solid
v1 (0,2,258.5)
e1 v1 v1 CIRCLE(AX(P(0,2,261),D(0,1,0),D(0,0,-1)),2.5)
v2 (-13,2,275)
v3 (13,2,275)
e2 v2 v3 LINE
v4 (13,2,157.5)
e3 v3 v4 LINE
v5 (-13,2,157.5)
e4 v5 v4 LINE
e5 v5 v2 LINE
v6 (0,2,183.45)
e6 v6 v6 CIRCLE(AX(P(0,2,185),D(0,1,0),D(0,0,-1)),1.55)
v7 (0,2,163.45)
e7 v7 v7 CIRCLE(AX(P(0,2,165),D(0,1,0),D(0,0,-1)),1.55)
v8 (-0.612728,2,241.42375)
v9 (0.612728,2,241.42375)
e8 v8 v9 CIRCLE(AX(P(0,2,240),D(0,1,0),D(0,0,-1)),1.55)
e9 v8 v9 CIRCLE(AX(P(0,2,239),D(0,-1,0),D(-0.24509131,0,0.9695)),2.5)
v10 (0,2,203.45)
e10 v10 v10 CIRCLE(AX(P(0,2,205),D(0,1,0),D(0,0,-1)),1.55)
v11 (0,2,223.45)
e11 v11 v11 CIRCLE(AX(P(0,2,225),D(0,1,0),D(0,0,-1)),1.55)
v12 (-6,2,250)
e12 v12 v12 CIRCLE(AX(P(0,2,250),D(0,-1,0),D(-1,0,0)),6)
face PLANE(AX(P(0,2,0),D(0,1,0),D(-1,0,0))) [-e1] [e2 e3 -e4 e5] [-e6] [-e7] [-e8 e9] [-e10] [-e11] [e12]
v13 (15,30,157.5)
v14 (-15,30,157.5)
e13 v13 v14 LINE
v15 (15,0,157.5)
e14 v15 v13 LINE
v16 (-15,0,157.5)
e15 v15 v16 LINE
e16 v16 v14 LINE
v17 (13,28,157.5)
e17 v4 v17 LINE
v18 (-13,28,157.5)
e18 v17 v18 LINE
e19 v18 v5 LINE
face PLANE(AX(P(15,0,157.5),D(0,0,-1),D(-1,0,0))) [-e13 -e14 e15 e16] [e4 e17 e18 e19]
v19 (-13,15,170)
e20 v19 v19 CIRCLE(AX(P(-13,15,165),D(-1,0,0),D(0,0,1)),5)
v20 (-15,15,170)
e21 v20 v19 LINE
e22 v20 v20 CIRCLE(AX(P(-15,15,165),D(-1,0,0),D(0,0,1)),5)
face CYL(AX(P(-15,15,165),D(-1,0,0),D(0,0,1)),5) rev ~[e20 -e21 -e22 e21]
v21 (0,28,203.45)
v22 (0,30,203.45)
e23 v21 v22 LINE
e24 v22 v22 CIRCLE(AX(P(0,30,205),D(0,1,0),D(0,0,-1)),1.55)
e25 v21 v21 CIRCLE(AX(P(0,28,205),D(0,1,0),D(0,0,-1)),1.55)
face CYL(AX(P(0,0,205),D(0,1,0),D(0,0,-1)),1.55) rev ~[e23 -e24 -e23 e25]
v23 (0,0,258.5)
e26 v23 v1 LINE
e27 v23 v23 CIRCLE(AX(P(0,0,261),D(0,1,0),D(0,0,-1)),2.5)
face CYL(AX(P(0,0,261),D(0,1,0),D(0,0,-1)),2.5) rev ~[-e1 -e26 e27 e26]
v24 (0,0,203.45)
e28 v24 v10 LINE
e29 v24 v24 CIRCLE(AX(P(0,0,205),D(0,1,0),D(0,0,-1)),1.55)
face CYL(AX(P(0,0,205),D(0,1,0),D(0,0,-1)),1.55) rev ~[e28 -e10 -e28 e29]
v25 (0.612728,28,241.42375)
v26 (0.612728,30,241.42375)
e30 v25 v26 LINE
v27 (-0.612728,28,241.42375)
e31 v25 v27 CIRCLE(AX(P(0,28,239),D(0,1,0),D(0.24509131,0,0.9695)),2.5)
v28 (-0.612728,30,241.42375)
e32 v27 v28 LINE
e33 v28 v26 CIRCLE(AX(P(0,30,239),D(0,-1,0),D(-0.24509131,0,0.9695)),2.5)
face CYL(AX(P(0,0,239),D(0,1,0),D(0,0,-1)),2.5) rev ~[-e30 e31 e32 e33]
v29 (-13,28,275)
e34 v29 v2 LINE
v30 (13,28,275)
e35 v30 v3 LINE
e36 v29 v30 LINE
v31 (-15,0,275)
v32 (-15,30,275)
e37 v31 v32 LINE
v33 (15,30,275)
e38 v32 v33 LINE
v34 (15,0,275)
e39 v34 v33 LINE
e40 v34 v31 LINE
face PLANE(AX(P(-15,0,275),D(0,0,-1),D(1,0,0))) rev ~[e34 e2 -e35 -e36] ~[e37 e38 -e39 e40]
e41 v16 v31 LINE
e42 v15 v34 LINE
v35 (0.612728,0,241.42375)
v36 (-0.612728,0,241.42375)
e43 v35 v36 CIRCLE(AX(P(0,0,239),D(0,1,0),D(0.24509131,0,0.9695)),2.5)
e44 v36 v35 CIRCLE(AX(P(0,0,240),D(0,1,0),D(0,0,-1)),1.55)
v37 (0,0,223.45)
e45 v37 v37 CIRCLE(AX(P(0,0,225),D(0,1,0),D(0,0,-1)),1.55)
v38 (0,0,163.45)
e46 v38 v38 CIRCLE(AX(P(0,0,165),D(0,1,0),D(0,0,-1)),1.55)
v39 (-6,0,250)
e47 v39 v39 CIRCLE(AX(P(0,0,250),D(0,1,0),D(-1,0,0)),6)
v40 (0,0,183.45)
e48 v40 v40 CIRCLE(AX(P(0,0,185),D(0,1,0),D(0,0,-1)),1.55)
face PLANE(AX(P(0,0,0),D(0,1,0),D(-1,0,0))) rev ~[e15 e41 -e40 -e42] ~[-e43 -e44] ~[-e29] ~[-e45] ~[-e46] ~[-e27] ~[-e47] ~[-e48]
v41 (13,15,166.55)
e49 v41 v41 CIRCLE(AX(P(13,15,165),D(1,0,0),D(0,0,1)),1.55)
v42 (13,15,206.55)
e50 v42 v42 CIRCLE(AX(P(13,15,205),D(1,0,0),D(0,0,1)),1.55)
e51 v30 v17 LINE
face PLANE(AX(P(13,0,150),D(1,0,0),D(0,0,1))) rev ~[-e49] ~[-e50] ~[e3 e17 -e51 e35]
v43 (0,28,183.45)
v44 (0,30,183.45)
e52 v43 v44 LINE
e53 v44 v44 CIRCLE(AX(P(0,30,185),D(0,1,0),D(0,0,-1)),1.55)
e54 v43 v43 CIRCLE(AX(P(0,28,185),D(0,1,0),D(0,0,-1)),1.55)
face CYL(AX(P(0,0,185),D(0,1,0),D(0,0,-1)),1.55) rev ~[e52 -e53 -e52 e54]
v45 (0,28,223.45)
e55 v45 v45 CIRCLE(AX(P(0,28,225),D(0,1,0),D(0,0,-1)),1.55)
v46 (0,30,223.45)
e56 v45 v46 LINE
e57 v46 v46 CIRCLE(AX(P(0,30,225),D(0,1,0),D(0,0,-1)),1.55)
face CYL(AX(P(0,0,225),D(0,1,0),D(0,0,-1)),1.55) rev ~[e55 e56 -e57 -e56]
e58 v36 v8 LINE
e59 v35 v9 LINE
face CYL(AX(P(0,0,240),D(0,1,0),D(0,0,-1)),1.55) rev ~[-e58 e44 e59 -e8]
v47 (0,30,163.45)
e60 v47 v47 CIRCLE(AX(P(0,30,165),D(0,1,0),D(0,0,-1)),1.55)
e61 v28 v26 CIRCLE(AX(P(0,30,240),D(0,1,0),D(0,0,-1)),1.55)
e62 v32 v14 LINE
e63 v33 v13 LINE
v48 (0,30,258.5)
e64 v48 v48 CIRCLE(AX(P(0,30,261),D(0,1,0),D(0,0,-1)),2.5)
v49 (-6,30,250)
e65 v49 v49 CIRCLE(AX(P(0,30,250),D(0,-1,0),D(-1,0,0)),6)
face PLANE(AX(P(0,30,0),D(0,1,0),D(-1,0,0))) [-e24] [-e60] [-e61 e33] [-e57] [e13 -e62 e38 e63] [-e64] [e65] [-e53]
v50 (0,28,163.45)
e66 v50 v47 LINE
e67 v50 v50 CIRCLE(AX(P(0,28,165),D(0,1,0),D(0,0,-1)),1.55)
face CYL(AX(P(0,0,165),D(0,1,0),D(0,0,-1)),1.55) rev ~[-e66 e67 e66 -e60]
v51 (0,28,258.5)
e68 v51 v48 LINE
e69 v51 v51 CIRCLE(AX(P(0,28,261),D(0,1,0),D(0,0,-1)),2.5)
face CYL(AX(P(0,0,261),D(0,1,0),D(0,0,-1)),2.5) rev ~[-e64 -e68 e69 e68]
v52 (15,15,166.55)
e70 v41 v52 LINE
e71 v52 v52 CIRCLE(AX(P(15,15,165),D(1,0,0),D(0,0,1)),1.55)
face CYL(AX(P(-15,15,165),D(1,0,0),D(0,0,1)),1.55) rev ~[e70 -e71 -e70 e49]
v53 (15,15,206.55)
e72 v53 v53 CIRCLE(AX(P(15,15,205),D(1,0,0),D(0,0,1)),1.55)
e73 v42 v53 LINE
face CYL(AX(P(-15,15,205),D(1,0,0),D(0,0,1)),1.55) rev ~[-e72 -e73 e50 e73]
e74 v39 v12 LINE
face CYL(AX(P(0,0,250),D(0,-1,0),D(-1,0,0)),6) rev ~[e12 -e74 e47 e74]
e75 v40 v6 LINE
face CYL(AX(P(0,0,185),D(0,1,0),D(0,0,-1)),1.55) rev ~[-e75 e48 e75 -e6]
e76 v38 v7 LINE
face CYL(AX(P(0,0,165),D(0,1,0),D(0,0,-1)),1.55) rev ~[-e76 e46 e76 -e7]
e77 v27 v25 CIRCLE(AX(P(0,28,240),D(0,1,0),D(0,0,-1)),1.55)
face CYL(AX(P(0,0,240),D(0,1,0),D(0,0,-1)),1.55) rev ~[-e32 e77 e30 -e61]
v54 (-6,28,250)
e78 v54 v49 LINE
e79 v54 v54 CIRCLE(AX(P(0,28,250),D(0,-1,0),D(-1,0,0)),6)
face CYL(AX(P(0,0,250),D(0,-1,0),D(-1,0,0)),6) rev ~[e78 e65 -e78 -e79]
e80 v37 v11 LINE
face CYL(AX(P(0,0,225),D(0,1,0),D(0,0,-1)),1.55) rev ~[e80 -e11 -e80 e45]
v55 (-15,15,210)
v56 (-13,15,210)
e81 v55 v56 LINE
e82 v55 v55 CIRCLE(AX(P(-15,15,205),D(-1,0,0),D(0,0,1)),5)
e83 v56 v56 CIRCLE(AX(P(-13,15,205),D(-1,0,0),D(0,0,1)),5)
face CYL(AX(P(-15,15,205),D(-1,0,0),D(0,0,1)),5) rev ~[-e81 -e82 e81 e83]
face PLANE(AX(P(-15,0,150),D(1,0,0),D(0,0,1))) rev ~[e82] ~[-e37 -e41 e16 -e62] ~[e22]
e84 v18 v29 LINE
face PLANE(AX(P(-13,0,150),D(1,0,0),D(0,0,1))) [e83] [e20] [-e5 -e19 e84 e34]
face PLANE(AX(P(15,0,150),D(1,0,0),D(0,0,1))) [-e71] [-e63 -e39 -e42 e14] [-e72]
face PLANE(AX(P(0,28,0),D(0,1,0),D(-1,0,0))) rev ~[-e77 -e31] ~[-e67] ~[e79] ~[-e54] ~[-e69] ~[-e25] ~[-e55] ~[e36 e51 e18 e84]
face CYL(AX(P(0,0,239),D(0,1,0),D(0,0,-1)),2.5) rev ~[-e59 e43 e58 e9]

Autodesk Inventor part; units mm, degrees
ref_plane "YZ Plane" through (0, 0, 0) normal (1, 0, 0) x (0, 1, 0)
ref_plane "XZ Plane" through (0, 0, 0) normal (0, 1, 0) x (-1, 0, 0)
ref_plane "XY Plane" through (0, 0, 0) normal (0, 0, 1) x (1, 0, 0)
sketch "スケッチ1" plane through (0, 0, 0) normal (0, 1, 0) x (-1, 0, 0)
  circle A0 centre (0, 0) radius 122.5
  line L0 (0, 0) -> (21.2719, 120.6389)
  line L1 (21.2719, 120.6389) -> (-21.2719, -120.6389)
  line L2 (21.2719, 120.6389) -> (-41.166, -233.4643)
  arc A1 (21.2719, 120.6389) -> (0, 122.5) centre (0, 0) ccw
  arc A2 (-21.2719, -120.6389) -> (0, -122.5) centre (0, 0) ccw
  arc A3 (-41.8975, -115.1123) -> (-21.2719, -120.6389) centre (0, 0) ccw
  circle A4 centre (0, 0) radius 125
  circle A5 centre (0, 0) radius 145
  arc A6 (-42.7525, -117.4616) -> (-105.9051, -66.4011) centre (0, 0) ccw
  line L3 (0, 0) -> (-42.7525, -117.4616) construction
  line L4 (21.706, 123.101) -> (21.706, 123.101)
  line L5 (0, -145) -> (0, -265.735)
  line L6 (0, 0) -> (-41.8975, -115.1123)
  line L7 (-49.5929, -136.2554) -> (-41.8975, -115.1123)
  line L8 (-42.7525, -117.4616) -> (-231.4975, -48.764)
  line L9 (42.7525, 117.4616) -> (0, 0)
  line L10 (0, -145) -> (0, 145)
  line L11 (0, 0) -> (0, 250)
  circle A7 centre (0, 250) radius 20
  line L12 (113.4405, 52.5) -> (18.1505, 258.4)
  line L13 (0, 0) -> (185.4327, 0)
  line L14 (0, 0) -> (-259.4726, 94.4403)
  line L15 (42.7525, 117.4616) -> (-253.7236, 225.3701)
  line L16 (0, 125) -> (22.0409, 125)
  line L17 (21.2719, 120.6389) -> (25.179, 142.7971)
  line L18 (42.7525, 117.4616) -> (60.6365, 166.5974)
  line L19 (15, 170) -> (59.0618, 170)
  line L20 (15.9946, 175) -> (56.7478, 175)
  line L21 (0, 125) -> (-15, 125)
  line L22 (-15, 125) -> (-15, 275)
  line L23 (-15, 275) -> (0, 275)
  line L24 (0, 275) -> (0, 125)
  line L25 (0, 125) -> (15, 125)
  line L26 (15, 125) -> (15, 275)
  line L27 (15, 275) -> (0, 275)
  line L28 (0, 275) -> (0, 125)
  line L29 (15, 200) -> (15, 275)
  line L30 (15, 275) -> (-15, 275)
  line L31 (-15, 275) -> (-15, 150)
  line L32 (15, 170) -> (37.5, 170)
  line L33 (37.5, 170) -> (17.5, 170)
  line L34 (0, 0) -> (0, 250)
  line L35 (0, -125) -> (42.7525, 117.4616)
  line L36 (-42.7525, -117.4616) -> (0, 125)
  line L37 (0, -125) -> (-3.519, -144.9573)
  line L38 (42.7525, 117.4616) -> (49.5929, 136.2554)
  line L39 (0, 125) -> (3.519, 144.9573)
  line L40 (-42.7525, -117.4616) -> (-46.2715, -137.4189)
  line L41 (42.7525, 117.4616) -> (46.2715, 137.4189)
  line L42 (-3.519, -144.9573) -> (46.2715, 137.4189)
  line L43 (46.2715, 137.4189) -> (37.2054, 139.0175)
  line L44 (-12.5852, -143.3587) -> (-3.519, -144.9573)
  line L45 (-46.2715, -137.4189) -> (3.519, 144.9573)
  line L46 (3.519, 144.9573) -> (12.5852, 143.3587)
  line L47 (-37.2054, -139.0175) -> (-46.2715, -137.4189)
  line L48 (-27.6373, -142.3418) -> (-22.7132, -143.21)
  line L49 (-27.6373, -142.3418) -> (-22.7132, -143.21)
  line L50 (-22.7132, -143.21) -> (27.641, 142.363)
  line L51 (27.641, 142.363) -> (22.717, 143.2312)
  line L52 (22.717, 143.2312) -> (-27.6373, -142.3418)
  line L53 (12.5852, 143.3587) -> (-37.2054, -139.0175)
  line L54 (-12.5852, -143.3587) -> (37.2054, 139.0175)
  line L55 (-42.1294, -138.1492) -> (7.6611, 144.2269)
  line L56 (-7.6611, -144.2269) -> (42.1294, 138.1492)
  line L57 (12.5852, 143.3587) -> (7.6611, 144.2269)
  line L58 (7.6611, 144.2269) -> (23.8851, 236.2374)
  line L59 (23.8851, 236.2374) -> (28.8091, 235.3692)
  line L60 (28.8091, 235.3692) -> (12.5852, 143.3587)
  line L61 (22.717, 143.2312) -> (25.179, 142.7971)
  line L62 (25.179, 142.7971) -> (42.462, 240.8141)
  line L63 (42.462, 240.8141) -> (40, 241.2482)
  line L64 (40, 241.2482) -> (22.717, 143.2312)
  line L65 (42.1294, 138.1492) -> (37.2054, 139.0175)
  line L66 (37.2054, 139.0175) -> (45.9435, 188.5741)
  line L67 (45.9435, 188.5741) -> (50.8676, 187.7058)
  line L68 (50.8676, 187.7058) -> (42.1294, 138.1492)
  line L69 (25.179, 142.7971) -> (27.641, 142.363)
  line L70 (27.641, 142.363) -> (39.8383, 211.5375)
  line L71 (39.8383, 211.5375) -> (37.3763, 211.9716)
  line L72 (37.3763, 211.9716) -> (25.179, 142.7971)
  line L73 (15.9946, 175) -> (15, 175)
  line L74 (15, 175) -> (0, 175)
  line L75 (0, 175) -> (0, 170)
  line L76 (0, 170) -> (15, 170)
  line L77 (15, 170) -> (15, 175)
  line L78 (20, 175) -> (40, 175)
  line L79 (40, 175) -> (40, 245)
  line L80 (40, 245) -> (20, 245)
  line L81 (20, 245) -> (20, 175)
  line L82 (30, 175) -> (30, 118.7697)
  line L83 (0, 175) -> (45.1779, 175)
  line L84 (45.1779, 175) -> (45.1779, 200)
  line L85 (45.1779, 200) -> (0, 200)
  line L86 (0, 200) -> (0, 175)
  line L87 (0, 200) -> (50, 200)
  line L88 (50, 200) -> (50, 170)
  line L89 (50, 170) -> (0, 170)
  line L90 (0, 170) -> (0, 200)
  line L91 (50, 170) -> (0, 170)
  line L92 (0, 170) -> (0, 165)
  line L93 (0, 200) -> (-15, 200)
  line L94 (-15, 200) -> (-15, 180)
  line L95 (-15, 180) -> (0, 180)
  line L96 (0, 180) -> (0, 200)
  line L97 (0, 180) -> (-15, 180)
  line L98 (-15, 180) -> (-15, 175)
  line L99 (-15, 175) -> (0, 175)
  line L100 (0, 175) -> (0, 180)
  line L101 (0, 145) -> (-15, 145)
  line L102 (-15, 145) -> (-20.5, 145)
  line L103 (-20.5, 145) -> (-20.5, 200)
  line L104 (-20.5, 200) -> (-15, 200)
  line L105 (-15, 200) -> (-15, 145)
  line L106 (-20.5, 150) -> (-25, 150)
  line L107 (-25, 150) -> (-25, 180)
  line L108 (-25, 180) -> (-20.5, 180)
  line L109 (-20.5, 180) -> (-20.5, 150)
  line L110 (50, 175) -> (-15, 175)
  line L111 (-15, 175) -> (-15, 170)
  line L112 (50, 170) -> (50, 175)
  line L113 (-20.5, 165) -> (-25, 165)
  line L114 (-25, 165) -> (-25, 195)
  line L115 (-25, 195) -> (-20.5, 195)
  line L116 (-20.5, 195) -> (-20.5, 165)
  line L117 (15, 250) -> (-15, 250)
  line L118 (-15, 145) -> (15, 145)
  line L119 (26.3471, 235.8033) -> (-39.6674, -138.5834)
  line L120 (48.4056, 188.14) -> (-10.1232, -143.7928)
  line L121 (49.3441, 179.0659) -> (14.8758, 185.1436)
  line L122 (-15, 138.4818) -> (-15, 121.5782)
  line L123 (-7.6611, -144.2269) -> (-42.1294, -138.1492)
  line L124 (-39.6243, -123.9424) -> (-5.1561, -130.02)
  line L125 (-42.2291, -138.7145) -> (-7.7608, -144.7922)
  line L126 (-41.3608, -133.7904) -> (-6.8926, -139.8681)
  line L127 (-6.0243, -134.9441) -> (-40.4926, -128.8664)
  line L128 (18.3488, 204.8397) -> (52.8171, 198.762)
  line L129 (50.2124, 183.9899) -> (45.0029, 154.4457)
  line L130 (10.5346, 160.5234) -> (15.7441, 190.0676)
  line L131 (19.217, 209.7638) -> (53.6853, 203.6861)
  line L132 (15, 250) -> (53.6853, 203.6861)
  line L133 (53.6853, 203.6861) -> (53.6853, 170)
  line L134 (53.6853, 170) -> (-15, 170)
  line L135 (-15, 172.5) -> (53.6853, 172.5)
  line L136 (15, 170) -> (15, 150)
  line L137 (15, 150) -> (-15, 150)
  line L138 (-15, 170) -> (15, 170)
  line L139 (15, 150) -> (-15, 150)
  line L140 (-15, 150) -> (-15, 275)
  line L141 (-15, 275) -> (15, 275)
  line L142 (15, 275) -> (15, 150)
  circle A8 centre (0, 250) radius 6
  circle A9 centre (0, 250) radius 11
  line L143 (47.7456, 170) -> (15, 150)
  point P0 (-25.1752, -142.7759)
  point P1 (42.3116, 114.9608)
  point P2 (0, 133.0222)
  point P3 (-38.8988, -134.2246)
  point P4 (-38.0306, -129.3005)
  point P5 (-23.2585, -131.9052)
  point P6 (-24.1267, -136.8293)
  point P7 (-9.3546, -139.434)
  point P8 (-8.4863, -134.51)
  point P9 (17.3379, 184.7094)
  point P10 (32.11, 182.1047)
  point P11 (46.8821, 179.5)
  point P12 (50.3551, 199.1962)
  point P13 (35.5829, 201.8009)
  point P14 (20.8108, 204.4056)
  point P15 (0, 240)
  point P16 (0, 190)
  point P17 (0, 239)
  point P18 (0, 261)
  point P19 (37.5, 172.5)
  point P20 (22.5, 172.5)
  point P21 (0, 275)
  point P22 (15, 185.1217)
  point P23 (15, 185.8477)
  point P24 (-11, 250)
  point P25 (11, 250)
  dimension "d0" = 245
  dimension "d7" = 290
  dimension "d19" = 40
  dimension "d1" = 0
  dimension "d4" = 42.5438
  dimension "d5" = 21.3532
  dimension "d6" = 250
  dimension "d10" = 0
  dimension "d12" = 0
  dimension "d13" = 10
  dimension "d15" = 0
  dimension "d16" = 9.8877
  dimension "d18" = 10
  dimension "d21" = 145
  dimension "d23" = 125
  dimension "d26" = 7.5384
  dimension "d30" = 180
  dimension "d34" = 180
  dimension "d35" = 45
  dimension "d37" = 5
  dimension "d38" = 15
  dimension "d39" = 150
  dimension "d40" = 15
  dimension "d41" = 150
  dimension "d47" = 250
  dimension "d52" = 5
  dimension "d53" = 0
  dimension "d54" = 10
  dimension "d55" = 10
  dimension "d56" = 5
  dimension "d57" = 5
  dimension "d60" = 5
  dimension "d61" = 20
  dimension "d62" = 70
  dimension "d63" = 5
  dimension "d65" = 25
  dimension "d66" = 50
  dimension "d68" = 20
  dimension "d69" = 5
  dimension "d74" = 20
  dimension "d75" = 5.5
  dimension "d76" = 55
  dimension "d77" = 4.5
  dimension "d78" = 30
  dimension "d79" = 5
  dimension "d82" = 15
  dimension "d83" = 50
  dimension "d87" = 16.9036
  dimension "d88" = 10.0392
  dimension "d89" = 10.5222
  dimension "d92" = 15
  dimension "d93" = 5
  dimension "d94" = 5
  dimension "d96" = 4.5
  dimension "d97" = 5
  dimension "d98" = 30
  dimension "d99" = 10
  dimension "d101" = 20
  dimension "d102" = 10
  dimension "d103" = 20
  dimension "d104" = 12
  dimension "d105" = 22
  dimension "d106" = 7.5
  dimension "d107" = 15
  dimension "d108" = 30
extrude "押し出し1" add sketch "スケッチ1" along normal blind 30 contours L137 L60 L26 | L60 L137 L119 L76 L26 | L76 L119 L26 | L137 L58 L76 L119 | L119 L76 L58 L135 L26 | L137 L11 L76 L58 | L26 L117 A9 L24 A7 | A7 L24 L27 L26 | L137 L22 L134 L11 | L135 L58 L74 L26 | L76 L11 L135 L58 | L24 A9 L117 L22 A7 | A7 L22 L23 L24 | L26 A7 L11 A9 L117 | L74 L58 L121 L26 | L135 L11 L74 L58 | L134 L22 L135 L11 | L26 L85 L11 A7 | A9 L117 A8 L24 | L24 A8 L117 A9 | A9 L11 A8 L117 | L121 L58 L26 | L74 L11 L85 L26 L58 | L135 L22 L99 L11 | A7 L22 L117 A9 L11 | L11 L93 L22 A7 | L117 A8 L11 A9 | L99 L22 L95 L11 | L11 L95 L22 L93
shell "シェル1" thickness 2 removed faces 3 at (-5, 10, 275) at (-5.9805, 20, 249.5172) at (5, 10, 150)
sketch "スケッチ3" plane through (0, 0, 0) normal (0, -1, 0) x (1, 0, 0)
  line L0 (15, 150) -> (-15, 150) projected
  line L1 (-13, 150) -> (-13, 275) projected
  point P0 (0, 0)
  point P1 (0, 165)
  point P2 (0, 150)
  point P3 (0, 240)
  point P4 (0, 185)
  point P5 (0, 205)
  point P6 (0, 225)
  dimension "d119" = 15
  dimension "d120" = 0
  dimension "d146" = 20
  dimension "d147" = 20
  dimension "d148" = 13
  dimension "d151" = 20
hole "穴1" at (0, 0, 239) at (0, 0, 261) direction (0, 1, 0) diameter 5 end through all
hole "穴2" at (0, 0, 165) at (0, 0, 240) at (0, 0, 205) at (0, 0, 185) at (0, 0, 225) direction (0, 1, 0) diameter 3.1 end through all
sketch "スケッチ4" plane through (-15, 0, 150) normal (-1, 0, 0) x (0, 0, 1)
  line L0 (0, 0) -> (0, 30) projected
  line L1 (0, 15) -> (125, 15)
  line L2 (125, 0) -> (125, 30) projected
  point P0 (-150, 0)
  point P1 (15, 15)
  point P2 (55, 15)
  dimension "d129" = 15
  dimension "d130" = 40
hole "穴3" at (-15, 15, 165) at (-15, 15, 205) direction (1, 0, 0) diameter 3.1 end through all
sketch "スケッチ6" plane through (-15, 0, 150) normal (-1, 0, 0) x (0, 0, 1)
  circle A0 centre (15, 15) radius 1.55 projected
  circle A1 centre (15, 15) radius 5
  circle A2 centre (55, 15) radius 1.55 projected
  circle A3 centre (55, 15) radius 5
  point P0 (-150, 0)
  dimension "d142" = 10
  dimension "d143" = 10
extrude "押し出し3" cut sketch "スケッチ6" against normal blind 5 contours A0 | A1 | A2 | A3
sketch "スケッチ7" plane through (15, 0, 150) normal (0, 0, -1) x (-1, 0, 0)
  line L0 (2, 2) -> (2, 28) projected
  line L1 (2, 28) -> (28, 28) projected
  line L2 (28, 28) -> (28, 2) projected
  line L3 (28, 2) -> (2, 2) projected
  line L4 (0, 0) -> (30, 0) projected
  line L5 (30, 0) -> (30, 30) projected
  line L6 (0, 30) -> (30, 30) projected
  line L7 (0, 0) -> (0, 30) projected
  point P0 (15, 0)
extrude "押し出し4" cut sketch "スケッチ7" against normal blind 7.5
equation "\"d18\" = d13"
properties part number "hand2_03" material "アルミニウム 6061-AHC"
